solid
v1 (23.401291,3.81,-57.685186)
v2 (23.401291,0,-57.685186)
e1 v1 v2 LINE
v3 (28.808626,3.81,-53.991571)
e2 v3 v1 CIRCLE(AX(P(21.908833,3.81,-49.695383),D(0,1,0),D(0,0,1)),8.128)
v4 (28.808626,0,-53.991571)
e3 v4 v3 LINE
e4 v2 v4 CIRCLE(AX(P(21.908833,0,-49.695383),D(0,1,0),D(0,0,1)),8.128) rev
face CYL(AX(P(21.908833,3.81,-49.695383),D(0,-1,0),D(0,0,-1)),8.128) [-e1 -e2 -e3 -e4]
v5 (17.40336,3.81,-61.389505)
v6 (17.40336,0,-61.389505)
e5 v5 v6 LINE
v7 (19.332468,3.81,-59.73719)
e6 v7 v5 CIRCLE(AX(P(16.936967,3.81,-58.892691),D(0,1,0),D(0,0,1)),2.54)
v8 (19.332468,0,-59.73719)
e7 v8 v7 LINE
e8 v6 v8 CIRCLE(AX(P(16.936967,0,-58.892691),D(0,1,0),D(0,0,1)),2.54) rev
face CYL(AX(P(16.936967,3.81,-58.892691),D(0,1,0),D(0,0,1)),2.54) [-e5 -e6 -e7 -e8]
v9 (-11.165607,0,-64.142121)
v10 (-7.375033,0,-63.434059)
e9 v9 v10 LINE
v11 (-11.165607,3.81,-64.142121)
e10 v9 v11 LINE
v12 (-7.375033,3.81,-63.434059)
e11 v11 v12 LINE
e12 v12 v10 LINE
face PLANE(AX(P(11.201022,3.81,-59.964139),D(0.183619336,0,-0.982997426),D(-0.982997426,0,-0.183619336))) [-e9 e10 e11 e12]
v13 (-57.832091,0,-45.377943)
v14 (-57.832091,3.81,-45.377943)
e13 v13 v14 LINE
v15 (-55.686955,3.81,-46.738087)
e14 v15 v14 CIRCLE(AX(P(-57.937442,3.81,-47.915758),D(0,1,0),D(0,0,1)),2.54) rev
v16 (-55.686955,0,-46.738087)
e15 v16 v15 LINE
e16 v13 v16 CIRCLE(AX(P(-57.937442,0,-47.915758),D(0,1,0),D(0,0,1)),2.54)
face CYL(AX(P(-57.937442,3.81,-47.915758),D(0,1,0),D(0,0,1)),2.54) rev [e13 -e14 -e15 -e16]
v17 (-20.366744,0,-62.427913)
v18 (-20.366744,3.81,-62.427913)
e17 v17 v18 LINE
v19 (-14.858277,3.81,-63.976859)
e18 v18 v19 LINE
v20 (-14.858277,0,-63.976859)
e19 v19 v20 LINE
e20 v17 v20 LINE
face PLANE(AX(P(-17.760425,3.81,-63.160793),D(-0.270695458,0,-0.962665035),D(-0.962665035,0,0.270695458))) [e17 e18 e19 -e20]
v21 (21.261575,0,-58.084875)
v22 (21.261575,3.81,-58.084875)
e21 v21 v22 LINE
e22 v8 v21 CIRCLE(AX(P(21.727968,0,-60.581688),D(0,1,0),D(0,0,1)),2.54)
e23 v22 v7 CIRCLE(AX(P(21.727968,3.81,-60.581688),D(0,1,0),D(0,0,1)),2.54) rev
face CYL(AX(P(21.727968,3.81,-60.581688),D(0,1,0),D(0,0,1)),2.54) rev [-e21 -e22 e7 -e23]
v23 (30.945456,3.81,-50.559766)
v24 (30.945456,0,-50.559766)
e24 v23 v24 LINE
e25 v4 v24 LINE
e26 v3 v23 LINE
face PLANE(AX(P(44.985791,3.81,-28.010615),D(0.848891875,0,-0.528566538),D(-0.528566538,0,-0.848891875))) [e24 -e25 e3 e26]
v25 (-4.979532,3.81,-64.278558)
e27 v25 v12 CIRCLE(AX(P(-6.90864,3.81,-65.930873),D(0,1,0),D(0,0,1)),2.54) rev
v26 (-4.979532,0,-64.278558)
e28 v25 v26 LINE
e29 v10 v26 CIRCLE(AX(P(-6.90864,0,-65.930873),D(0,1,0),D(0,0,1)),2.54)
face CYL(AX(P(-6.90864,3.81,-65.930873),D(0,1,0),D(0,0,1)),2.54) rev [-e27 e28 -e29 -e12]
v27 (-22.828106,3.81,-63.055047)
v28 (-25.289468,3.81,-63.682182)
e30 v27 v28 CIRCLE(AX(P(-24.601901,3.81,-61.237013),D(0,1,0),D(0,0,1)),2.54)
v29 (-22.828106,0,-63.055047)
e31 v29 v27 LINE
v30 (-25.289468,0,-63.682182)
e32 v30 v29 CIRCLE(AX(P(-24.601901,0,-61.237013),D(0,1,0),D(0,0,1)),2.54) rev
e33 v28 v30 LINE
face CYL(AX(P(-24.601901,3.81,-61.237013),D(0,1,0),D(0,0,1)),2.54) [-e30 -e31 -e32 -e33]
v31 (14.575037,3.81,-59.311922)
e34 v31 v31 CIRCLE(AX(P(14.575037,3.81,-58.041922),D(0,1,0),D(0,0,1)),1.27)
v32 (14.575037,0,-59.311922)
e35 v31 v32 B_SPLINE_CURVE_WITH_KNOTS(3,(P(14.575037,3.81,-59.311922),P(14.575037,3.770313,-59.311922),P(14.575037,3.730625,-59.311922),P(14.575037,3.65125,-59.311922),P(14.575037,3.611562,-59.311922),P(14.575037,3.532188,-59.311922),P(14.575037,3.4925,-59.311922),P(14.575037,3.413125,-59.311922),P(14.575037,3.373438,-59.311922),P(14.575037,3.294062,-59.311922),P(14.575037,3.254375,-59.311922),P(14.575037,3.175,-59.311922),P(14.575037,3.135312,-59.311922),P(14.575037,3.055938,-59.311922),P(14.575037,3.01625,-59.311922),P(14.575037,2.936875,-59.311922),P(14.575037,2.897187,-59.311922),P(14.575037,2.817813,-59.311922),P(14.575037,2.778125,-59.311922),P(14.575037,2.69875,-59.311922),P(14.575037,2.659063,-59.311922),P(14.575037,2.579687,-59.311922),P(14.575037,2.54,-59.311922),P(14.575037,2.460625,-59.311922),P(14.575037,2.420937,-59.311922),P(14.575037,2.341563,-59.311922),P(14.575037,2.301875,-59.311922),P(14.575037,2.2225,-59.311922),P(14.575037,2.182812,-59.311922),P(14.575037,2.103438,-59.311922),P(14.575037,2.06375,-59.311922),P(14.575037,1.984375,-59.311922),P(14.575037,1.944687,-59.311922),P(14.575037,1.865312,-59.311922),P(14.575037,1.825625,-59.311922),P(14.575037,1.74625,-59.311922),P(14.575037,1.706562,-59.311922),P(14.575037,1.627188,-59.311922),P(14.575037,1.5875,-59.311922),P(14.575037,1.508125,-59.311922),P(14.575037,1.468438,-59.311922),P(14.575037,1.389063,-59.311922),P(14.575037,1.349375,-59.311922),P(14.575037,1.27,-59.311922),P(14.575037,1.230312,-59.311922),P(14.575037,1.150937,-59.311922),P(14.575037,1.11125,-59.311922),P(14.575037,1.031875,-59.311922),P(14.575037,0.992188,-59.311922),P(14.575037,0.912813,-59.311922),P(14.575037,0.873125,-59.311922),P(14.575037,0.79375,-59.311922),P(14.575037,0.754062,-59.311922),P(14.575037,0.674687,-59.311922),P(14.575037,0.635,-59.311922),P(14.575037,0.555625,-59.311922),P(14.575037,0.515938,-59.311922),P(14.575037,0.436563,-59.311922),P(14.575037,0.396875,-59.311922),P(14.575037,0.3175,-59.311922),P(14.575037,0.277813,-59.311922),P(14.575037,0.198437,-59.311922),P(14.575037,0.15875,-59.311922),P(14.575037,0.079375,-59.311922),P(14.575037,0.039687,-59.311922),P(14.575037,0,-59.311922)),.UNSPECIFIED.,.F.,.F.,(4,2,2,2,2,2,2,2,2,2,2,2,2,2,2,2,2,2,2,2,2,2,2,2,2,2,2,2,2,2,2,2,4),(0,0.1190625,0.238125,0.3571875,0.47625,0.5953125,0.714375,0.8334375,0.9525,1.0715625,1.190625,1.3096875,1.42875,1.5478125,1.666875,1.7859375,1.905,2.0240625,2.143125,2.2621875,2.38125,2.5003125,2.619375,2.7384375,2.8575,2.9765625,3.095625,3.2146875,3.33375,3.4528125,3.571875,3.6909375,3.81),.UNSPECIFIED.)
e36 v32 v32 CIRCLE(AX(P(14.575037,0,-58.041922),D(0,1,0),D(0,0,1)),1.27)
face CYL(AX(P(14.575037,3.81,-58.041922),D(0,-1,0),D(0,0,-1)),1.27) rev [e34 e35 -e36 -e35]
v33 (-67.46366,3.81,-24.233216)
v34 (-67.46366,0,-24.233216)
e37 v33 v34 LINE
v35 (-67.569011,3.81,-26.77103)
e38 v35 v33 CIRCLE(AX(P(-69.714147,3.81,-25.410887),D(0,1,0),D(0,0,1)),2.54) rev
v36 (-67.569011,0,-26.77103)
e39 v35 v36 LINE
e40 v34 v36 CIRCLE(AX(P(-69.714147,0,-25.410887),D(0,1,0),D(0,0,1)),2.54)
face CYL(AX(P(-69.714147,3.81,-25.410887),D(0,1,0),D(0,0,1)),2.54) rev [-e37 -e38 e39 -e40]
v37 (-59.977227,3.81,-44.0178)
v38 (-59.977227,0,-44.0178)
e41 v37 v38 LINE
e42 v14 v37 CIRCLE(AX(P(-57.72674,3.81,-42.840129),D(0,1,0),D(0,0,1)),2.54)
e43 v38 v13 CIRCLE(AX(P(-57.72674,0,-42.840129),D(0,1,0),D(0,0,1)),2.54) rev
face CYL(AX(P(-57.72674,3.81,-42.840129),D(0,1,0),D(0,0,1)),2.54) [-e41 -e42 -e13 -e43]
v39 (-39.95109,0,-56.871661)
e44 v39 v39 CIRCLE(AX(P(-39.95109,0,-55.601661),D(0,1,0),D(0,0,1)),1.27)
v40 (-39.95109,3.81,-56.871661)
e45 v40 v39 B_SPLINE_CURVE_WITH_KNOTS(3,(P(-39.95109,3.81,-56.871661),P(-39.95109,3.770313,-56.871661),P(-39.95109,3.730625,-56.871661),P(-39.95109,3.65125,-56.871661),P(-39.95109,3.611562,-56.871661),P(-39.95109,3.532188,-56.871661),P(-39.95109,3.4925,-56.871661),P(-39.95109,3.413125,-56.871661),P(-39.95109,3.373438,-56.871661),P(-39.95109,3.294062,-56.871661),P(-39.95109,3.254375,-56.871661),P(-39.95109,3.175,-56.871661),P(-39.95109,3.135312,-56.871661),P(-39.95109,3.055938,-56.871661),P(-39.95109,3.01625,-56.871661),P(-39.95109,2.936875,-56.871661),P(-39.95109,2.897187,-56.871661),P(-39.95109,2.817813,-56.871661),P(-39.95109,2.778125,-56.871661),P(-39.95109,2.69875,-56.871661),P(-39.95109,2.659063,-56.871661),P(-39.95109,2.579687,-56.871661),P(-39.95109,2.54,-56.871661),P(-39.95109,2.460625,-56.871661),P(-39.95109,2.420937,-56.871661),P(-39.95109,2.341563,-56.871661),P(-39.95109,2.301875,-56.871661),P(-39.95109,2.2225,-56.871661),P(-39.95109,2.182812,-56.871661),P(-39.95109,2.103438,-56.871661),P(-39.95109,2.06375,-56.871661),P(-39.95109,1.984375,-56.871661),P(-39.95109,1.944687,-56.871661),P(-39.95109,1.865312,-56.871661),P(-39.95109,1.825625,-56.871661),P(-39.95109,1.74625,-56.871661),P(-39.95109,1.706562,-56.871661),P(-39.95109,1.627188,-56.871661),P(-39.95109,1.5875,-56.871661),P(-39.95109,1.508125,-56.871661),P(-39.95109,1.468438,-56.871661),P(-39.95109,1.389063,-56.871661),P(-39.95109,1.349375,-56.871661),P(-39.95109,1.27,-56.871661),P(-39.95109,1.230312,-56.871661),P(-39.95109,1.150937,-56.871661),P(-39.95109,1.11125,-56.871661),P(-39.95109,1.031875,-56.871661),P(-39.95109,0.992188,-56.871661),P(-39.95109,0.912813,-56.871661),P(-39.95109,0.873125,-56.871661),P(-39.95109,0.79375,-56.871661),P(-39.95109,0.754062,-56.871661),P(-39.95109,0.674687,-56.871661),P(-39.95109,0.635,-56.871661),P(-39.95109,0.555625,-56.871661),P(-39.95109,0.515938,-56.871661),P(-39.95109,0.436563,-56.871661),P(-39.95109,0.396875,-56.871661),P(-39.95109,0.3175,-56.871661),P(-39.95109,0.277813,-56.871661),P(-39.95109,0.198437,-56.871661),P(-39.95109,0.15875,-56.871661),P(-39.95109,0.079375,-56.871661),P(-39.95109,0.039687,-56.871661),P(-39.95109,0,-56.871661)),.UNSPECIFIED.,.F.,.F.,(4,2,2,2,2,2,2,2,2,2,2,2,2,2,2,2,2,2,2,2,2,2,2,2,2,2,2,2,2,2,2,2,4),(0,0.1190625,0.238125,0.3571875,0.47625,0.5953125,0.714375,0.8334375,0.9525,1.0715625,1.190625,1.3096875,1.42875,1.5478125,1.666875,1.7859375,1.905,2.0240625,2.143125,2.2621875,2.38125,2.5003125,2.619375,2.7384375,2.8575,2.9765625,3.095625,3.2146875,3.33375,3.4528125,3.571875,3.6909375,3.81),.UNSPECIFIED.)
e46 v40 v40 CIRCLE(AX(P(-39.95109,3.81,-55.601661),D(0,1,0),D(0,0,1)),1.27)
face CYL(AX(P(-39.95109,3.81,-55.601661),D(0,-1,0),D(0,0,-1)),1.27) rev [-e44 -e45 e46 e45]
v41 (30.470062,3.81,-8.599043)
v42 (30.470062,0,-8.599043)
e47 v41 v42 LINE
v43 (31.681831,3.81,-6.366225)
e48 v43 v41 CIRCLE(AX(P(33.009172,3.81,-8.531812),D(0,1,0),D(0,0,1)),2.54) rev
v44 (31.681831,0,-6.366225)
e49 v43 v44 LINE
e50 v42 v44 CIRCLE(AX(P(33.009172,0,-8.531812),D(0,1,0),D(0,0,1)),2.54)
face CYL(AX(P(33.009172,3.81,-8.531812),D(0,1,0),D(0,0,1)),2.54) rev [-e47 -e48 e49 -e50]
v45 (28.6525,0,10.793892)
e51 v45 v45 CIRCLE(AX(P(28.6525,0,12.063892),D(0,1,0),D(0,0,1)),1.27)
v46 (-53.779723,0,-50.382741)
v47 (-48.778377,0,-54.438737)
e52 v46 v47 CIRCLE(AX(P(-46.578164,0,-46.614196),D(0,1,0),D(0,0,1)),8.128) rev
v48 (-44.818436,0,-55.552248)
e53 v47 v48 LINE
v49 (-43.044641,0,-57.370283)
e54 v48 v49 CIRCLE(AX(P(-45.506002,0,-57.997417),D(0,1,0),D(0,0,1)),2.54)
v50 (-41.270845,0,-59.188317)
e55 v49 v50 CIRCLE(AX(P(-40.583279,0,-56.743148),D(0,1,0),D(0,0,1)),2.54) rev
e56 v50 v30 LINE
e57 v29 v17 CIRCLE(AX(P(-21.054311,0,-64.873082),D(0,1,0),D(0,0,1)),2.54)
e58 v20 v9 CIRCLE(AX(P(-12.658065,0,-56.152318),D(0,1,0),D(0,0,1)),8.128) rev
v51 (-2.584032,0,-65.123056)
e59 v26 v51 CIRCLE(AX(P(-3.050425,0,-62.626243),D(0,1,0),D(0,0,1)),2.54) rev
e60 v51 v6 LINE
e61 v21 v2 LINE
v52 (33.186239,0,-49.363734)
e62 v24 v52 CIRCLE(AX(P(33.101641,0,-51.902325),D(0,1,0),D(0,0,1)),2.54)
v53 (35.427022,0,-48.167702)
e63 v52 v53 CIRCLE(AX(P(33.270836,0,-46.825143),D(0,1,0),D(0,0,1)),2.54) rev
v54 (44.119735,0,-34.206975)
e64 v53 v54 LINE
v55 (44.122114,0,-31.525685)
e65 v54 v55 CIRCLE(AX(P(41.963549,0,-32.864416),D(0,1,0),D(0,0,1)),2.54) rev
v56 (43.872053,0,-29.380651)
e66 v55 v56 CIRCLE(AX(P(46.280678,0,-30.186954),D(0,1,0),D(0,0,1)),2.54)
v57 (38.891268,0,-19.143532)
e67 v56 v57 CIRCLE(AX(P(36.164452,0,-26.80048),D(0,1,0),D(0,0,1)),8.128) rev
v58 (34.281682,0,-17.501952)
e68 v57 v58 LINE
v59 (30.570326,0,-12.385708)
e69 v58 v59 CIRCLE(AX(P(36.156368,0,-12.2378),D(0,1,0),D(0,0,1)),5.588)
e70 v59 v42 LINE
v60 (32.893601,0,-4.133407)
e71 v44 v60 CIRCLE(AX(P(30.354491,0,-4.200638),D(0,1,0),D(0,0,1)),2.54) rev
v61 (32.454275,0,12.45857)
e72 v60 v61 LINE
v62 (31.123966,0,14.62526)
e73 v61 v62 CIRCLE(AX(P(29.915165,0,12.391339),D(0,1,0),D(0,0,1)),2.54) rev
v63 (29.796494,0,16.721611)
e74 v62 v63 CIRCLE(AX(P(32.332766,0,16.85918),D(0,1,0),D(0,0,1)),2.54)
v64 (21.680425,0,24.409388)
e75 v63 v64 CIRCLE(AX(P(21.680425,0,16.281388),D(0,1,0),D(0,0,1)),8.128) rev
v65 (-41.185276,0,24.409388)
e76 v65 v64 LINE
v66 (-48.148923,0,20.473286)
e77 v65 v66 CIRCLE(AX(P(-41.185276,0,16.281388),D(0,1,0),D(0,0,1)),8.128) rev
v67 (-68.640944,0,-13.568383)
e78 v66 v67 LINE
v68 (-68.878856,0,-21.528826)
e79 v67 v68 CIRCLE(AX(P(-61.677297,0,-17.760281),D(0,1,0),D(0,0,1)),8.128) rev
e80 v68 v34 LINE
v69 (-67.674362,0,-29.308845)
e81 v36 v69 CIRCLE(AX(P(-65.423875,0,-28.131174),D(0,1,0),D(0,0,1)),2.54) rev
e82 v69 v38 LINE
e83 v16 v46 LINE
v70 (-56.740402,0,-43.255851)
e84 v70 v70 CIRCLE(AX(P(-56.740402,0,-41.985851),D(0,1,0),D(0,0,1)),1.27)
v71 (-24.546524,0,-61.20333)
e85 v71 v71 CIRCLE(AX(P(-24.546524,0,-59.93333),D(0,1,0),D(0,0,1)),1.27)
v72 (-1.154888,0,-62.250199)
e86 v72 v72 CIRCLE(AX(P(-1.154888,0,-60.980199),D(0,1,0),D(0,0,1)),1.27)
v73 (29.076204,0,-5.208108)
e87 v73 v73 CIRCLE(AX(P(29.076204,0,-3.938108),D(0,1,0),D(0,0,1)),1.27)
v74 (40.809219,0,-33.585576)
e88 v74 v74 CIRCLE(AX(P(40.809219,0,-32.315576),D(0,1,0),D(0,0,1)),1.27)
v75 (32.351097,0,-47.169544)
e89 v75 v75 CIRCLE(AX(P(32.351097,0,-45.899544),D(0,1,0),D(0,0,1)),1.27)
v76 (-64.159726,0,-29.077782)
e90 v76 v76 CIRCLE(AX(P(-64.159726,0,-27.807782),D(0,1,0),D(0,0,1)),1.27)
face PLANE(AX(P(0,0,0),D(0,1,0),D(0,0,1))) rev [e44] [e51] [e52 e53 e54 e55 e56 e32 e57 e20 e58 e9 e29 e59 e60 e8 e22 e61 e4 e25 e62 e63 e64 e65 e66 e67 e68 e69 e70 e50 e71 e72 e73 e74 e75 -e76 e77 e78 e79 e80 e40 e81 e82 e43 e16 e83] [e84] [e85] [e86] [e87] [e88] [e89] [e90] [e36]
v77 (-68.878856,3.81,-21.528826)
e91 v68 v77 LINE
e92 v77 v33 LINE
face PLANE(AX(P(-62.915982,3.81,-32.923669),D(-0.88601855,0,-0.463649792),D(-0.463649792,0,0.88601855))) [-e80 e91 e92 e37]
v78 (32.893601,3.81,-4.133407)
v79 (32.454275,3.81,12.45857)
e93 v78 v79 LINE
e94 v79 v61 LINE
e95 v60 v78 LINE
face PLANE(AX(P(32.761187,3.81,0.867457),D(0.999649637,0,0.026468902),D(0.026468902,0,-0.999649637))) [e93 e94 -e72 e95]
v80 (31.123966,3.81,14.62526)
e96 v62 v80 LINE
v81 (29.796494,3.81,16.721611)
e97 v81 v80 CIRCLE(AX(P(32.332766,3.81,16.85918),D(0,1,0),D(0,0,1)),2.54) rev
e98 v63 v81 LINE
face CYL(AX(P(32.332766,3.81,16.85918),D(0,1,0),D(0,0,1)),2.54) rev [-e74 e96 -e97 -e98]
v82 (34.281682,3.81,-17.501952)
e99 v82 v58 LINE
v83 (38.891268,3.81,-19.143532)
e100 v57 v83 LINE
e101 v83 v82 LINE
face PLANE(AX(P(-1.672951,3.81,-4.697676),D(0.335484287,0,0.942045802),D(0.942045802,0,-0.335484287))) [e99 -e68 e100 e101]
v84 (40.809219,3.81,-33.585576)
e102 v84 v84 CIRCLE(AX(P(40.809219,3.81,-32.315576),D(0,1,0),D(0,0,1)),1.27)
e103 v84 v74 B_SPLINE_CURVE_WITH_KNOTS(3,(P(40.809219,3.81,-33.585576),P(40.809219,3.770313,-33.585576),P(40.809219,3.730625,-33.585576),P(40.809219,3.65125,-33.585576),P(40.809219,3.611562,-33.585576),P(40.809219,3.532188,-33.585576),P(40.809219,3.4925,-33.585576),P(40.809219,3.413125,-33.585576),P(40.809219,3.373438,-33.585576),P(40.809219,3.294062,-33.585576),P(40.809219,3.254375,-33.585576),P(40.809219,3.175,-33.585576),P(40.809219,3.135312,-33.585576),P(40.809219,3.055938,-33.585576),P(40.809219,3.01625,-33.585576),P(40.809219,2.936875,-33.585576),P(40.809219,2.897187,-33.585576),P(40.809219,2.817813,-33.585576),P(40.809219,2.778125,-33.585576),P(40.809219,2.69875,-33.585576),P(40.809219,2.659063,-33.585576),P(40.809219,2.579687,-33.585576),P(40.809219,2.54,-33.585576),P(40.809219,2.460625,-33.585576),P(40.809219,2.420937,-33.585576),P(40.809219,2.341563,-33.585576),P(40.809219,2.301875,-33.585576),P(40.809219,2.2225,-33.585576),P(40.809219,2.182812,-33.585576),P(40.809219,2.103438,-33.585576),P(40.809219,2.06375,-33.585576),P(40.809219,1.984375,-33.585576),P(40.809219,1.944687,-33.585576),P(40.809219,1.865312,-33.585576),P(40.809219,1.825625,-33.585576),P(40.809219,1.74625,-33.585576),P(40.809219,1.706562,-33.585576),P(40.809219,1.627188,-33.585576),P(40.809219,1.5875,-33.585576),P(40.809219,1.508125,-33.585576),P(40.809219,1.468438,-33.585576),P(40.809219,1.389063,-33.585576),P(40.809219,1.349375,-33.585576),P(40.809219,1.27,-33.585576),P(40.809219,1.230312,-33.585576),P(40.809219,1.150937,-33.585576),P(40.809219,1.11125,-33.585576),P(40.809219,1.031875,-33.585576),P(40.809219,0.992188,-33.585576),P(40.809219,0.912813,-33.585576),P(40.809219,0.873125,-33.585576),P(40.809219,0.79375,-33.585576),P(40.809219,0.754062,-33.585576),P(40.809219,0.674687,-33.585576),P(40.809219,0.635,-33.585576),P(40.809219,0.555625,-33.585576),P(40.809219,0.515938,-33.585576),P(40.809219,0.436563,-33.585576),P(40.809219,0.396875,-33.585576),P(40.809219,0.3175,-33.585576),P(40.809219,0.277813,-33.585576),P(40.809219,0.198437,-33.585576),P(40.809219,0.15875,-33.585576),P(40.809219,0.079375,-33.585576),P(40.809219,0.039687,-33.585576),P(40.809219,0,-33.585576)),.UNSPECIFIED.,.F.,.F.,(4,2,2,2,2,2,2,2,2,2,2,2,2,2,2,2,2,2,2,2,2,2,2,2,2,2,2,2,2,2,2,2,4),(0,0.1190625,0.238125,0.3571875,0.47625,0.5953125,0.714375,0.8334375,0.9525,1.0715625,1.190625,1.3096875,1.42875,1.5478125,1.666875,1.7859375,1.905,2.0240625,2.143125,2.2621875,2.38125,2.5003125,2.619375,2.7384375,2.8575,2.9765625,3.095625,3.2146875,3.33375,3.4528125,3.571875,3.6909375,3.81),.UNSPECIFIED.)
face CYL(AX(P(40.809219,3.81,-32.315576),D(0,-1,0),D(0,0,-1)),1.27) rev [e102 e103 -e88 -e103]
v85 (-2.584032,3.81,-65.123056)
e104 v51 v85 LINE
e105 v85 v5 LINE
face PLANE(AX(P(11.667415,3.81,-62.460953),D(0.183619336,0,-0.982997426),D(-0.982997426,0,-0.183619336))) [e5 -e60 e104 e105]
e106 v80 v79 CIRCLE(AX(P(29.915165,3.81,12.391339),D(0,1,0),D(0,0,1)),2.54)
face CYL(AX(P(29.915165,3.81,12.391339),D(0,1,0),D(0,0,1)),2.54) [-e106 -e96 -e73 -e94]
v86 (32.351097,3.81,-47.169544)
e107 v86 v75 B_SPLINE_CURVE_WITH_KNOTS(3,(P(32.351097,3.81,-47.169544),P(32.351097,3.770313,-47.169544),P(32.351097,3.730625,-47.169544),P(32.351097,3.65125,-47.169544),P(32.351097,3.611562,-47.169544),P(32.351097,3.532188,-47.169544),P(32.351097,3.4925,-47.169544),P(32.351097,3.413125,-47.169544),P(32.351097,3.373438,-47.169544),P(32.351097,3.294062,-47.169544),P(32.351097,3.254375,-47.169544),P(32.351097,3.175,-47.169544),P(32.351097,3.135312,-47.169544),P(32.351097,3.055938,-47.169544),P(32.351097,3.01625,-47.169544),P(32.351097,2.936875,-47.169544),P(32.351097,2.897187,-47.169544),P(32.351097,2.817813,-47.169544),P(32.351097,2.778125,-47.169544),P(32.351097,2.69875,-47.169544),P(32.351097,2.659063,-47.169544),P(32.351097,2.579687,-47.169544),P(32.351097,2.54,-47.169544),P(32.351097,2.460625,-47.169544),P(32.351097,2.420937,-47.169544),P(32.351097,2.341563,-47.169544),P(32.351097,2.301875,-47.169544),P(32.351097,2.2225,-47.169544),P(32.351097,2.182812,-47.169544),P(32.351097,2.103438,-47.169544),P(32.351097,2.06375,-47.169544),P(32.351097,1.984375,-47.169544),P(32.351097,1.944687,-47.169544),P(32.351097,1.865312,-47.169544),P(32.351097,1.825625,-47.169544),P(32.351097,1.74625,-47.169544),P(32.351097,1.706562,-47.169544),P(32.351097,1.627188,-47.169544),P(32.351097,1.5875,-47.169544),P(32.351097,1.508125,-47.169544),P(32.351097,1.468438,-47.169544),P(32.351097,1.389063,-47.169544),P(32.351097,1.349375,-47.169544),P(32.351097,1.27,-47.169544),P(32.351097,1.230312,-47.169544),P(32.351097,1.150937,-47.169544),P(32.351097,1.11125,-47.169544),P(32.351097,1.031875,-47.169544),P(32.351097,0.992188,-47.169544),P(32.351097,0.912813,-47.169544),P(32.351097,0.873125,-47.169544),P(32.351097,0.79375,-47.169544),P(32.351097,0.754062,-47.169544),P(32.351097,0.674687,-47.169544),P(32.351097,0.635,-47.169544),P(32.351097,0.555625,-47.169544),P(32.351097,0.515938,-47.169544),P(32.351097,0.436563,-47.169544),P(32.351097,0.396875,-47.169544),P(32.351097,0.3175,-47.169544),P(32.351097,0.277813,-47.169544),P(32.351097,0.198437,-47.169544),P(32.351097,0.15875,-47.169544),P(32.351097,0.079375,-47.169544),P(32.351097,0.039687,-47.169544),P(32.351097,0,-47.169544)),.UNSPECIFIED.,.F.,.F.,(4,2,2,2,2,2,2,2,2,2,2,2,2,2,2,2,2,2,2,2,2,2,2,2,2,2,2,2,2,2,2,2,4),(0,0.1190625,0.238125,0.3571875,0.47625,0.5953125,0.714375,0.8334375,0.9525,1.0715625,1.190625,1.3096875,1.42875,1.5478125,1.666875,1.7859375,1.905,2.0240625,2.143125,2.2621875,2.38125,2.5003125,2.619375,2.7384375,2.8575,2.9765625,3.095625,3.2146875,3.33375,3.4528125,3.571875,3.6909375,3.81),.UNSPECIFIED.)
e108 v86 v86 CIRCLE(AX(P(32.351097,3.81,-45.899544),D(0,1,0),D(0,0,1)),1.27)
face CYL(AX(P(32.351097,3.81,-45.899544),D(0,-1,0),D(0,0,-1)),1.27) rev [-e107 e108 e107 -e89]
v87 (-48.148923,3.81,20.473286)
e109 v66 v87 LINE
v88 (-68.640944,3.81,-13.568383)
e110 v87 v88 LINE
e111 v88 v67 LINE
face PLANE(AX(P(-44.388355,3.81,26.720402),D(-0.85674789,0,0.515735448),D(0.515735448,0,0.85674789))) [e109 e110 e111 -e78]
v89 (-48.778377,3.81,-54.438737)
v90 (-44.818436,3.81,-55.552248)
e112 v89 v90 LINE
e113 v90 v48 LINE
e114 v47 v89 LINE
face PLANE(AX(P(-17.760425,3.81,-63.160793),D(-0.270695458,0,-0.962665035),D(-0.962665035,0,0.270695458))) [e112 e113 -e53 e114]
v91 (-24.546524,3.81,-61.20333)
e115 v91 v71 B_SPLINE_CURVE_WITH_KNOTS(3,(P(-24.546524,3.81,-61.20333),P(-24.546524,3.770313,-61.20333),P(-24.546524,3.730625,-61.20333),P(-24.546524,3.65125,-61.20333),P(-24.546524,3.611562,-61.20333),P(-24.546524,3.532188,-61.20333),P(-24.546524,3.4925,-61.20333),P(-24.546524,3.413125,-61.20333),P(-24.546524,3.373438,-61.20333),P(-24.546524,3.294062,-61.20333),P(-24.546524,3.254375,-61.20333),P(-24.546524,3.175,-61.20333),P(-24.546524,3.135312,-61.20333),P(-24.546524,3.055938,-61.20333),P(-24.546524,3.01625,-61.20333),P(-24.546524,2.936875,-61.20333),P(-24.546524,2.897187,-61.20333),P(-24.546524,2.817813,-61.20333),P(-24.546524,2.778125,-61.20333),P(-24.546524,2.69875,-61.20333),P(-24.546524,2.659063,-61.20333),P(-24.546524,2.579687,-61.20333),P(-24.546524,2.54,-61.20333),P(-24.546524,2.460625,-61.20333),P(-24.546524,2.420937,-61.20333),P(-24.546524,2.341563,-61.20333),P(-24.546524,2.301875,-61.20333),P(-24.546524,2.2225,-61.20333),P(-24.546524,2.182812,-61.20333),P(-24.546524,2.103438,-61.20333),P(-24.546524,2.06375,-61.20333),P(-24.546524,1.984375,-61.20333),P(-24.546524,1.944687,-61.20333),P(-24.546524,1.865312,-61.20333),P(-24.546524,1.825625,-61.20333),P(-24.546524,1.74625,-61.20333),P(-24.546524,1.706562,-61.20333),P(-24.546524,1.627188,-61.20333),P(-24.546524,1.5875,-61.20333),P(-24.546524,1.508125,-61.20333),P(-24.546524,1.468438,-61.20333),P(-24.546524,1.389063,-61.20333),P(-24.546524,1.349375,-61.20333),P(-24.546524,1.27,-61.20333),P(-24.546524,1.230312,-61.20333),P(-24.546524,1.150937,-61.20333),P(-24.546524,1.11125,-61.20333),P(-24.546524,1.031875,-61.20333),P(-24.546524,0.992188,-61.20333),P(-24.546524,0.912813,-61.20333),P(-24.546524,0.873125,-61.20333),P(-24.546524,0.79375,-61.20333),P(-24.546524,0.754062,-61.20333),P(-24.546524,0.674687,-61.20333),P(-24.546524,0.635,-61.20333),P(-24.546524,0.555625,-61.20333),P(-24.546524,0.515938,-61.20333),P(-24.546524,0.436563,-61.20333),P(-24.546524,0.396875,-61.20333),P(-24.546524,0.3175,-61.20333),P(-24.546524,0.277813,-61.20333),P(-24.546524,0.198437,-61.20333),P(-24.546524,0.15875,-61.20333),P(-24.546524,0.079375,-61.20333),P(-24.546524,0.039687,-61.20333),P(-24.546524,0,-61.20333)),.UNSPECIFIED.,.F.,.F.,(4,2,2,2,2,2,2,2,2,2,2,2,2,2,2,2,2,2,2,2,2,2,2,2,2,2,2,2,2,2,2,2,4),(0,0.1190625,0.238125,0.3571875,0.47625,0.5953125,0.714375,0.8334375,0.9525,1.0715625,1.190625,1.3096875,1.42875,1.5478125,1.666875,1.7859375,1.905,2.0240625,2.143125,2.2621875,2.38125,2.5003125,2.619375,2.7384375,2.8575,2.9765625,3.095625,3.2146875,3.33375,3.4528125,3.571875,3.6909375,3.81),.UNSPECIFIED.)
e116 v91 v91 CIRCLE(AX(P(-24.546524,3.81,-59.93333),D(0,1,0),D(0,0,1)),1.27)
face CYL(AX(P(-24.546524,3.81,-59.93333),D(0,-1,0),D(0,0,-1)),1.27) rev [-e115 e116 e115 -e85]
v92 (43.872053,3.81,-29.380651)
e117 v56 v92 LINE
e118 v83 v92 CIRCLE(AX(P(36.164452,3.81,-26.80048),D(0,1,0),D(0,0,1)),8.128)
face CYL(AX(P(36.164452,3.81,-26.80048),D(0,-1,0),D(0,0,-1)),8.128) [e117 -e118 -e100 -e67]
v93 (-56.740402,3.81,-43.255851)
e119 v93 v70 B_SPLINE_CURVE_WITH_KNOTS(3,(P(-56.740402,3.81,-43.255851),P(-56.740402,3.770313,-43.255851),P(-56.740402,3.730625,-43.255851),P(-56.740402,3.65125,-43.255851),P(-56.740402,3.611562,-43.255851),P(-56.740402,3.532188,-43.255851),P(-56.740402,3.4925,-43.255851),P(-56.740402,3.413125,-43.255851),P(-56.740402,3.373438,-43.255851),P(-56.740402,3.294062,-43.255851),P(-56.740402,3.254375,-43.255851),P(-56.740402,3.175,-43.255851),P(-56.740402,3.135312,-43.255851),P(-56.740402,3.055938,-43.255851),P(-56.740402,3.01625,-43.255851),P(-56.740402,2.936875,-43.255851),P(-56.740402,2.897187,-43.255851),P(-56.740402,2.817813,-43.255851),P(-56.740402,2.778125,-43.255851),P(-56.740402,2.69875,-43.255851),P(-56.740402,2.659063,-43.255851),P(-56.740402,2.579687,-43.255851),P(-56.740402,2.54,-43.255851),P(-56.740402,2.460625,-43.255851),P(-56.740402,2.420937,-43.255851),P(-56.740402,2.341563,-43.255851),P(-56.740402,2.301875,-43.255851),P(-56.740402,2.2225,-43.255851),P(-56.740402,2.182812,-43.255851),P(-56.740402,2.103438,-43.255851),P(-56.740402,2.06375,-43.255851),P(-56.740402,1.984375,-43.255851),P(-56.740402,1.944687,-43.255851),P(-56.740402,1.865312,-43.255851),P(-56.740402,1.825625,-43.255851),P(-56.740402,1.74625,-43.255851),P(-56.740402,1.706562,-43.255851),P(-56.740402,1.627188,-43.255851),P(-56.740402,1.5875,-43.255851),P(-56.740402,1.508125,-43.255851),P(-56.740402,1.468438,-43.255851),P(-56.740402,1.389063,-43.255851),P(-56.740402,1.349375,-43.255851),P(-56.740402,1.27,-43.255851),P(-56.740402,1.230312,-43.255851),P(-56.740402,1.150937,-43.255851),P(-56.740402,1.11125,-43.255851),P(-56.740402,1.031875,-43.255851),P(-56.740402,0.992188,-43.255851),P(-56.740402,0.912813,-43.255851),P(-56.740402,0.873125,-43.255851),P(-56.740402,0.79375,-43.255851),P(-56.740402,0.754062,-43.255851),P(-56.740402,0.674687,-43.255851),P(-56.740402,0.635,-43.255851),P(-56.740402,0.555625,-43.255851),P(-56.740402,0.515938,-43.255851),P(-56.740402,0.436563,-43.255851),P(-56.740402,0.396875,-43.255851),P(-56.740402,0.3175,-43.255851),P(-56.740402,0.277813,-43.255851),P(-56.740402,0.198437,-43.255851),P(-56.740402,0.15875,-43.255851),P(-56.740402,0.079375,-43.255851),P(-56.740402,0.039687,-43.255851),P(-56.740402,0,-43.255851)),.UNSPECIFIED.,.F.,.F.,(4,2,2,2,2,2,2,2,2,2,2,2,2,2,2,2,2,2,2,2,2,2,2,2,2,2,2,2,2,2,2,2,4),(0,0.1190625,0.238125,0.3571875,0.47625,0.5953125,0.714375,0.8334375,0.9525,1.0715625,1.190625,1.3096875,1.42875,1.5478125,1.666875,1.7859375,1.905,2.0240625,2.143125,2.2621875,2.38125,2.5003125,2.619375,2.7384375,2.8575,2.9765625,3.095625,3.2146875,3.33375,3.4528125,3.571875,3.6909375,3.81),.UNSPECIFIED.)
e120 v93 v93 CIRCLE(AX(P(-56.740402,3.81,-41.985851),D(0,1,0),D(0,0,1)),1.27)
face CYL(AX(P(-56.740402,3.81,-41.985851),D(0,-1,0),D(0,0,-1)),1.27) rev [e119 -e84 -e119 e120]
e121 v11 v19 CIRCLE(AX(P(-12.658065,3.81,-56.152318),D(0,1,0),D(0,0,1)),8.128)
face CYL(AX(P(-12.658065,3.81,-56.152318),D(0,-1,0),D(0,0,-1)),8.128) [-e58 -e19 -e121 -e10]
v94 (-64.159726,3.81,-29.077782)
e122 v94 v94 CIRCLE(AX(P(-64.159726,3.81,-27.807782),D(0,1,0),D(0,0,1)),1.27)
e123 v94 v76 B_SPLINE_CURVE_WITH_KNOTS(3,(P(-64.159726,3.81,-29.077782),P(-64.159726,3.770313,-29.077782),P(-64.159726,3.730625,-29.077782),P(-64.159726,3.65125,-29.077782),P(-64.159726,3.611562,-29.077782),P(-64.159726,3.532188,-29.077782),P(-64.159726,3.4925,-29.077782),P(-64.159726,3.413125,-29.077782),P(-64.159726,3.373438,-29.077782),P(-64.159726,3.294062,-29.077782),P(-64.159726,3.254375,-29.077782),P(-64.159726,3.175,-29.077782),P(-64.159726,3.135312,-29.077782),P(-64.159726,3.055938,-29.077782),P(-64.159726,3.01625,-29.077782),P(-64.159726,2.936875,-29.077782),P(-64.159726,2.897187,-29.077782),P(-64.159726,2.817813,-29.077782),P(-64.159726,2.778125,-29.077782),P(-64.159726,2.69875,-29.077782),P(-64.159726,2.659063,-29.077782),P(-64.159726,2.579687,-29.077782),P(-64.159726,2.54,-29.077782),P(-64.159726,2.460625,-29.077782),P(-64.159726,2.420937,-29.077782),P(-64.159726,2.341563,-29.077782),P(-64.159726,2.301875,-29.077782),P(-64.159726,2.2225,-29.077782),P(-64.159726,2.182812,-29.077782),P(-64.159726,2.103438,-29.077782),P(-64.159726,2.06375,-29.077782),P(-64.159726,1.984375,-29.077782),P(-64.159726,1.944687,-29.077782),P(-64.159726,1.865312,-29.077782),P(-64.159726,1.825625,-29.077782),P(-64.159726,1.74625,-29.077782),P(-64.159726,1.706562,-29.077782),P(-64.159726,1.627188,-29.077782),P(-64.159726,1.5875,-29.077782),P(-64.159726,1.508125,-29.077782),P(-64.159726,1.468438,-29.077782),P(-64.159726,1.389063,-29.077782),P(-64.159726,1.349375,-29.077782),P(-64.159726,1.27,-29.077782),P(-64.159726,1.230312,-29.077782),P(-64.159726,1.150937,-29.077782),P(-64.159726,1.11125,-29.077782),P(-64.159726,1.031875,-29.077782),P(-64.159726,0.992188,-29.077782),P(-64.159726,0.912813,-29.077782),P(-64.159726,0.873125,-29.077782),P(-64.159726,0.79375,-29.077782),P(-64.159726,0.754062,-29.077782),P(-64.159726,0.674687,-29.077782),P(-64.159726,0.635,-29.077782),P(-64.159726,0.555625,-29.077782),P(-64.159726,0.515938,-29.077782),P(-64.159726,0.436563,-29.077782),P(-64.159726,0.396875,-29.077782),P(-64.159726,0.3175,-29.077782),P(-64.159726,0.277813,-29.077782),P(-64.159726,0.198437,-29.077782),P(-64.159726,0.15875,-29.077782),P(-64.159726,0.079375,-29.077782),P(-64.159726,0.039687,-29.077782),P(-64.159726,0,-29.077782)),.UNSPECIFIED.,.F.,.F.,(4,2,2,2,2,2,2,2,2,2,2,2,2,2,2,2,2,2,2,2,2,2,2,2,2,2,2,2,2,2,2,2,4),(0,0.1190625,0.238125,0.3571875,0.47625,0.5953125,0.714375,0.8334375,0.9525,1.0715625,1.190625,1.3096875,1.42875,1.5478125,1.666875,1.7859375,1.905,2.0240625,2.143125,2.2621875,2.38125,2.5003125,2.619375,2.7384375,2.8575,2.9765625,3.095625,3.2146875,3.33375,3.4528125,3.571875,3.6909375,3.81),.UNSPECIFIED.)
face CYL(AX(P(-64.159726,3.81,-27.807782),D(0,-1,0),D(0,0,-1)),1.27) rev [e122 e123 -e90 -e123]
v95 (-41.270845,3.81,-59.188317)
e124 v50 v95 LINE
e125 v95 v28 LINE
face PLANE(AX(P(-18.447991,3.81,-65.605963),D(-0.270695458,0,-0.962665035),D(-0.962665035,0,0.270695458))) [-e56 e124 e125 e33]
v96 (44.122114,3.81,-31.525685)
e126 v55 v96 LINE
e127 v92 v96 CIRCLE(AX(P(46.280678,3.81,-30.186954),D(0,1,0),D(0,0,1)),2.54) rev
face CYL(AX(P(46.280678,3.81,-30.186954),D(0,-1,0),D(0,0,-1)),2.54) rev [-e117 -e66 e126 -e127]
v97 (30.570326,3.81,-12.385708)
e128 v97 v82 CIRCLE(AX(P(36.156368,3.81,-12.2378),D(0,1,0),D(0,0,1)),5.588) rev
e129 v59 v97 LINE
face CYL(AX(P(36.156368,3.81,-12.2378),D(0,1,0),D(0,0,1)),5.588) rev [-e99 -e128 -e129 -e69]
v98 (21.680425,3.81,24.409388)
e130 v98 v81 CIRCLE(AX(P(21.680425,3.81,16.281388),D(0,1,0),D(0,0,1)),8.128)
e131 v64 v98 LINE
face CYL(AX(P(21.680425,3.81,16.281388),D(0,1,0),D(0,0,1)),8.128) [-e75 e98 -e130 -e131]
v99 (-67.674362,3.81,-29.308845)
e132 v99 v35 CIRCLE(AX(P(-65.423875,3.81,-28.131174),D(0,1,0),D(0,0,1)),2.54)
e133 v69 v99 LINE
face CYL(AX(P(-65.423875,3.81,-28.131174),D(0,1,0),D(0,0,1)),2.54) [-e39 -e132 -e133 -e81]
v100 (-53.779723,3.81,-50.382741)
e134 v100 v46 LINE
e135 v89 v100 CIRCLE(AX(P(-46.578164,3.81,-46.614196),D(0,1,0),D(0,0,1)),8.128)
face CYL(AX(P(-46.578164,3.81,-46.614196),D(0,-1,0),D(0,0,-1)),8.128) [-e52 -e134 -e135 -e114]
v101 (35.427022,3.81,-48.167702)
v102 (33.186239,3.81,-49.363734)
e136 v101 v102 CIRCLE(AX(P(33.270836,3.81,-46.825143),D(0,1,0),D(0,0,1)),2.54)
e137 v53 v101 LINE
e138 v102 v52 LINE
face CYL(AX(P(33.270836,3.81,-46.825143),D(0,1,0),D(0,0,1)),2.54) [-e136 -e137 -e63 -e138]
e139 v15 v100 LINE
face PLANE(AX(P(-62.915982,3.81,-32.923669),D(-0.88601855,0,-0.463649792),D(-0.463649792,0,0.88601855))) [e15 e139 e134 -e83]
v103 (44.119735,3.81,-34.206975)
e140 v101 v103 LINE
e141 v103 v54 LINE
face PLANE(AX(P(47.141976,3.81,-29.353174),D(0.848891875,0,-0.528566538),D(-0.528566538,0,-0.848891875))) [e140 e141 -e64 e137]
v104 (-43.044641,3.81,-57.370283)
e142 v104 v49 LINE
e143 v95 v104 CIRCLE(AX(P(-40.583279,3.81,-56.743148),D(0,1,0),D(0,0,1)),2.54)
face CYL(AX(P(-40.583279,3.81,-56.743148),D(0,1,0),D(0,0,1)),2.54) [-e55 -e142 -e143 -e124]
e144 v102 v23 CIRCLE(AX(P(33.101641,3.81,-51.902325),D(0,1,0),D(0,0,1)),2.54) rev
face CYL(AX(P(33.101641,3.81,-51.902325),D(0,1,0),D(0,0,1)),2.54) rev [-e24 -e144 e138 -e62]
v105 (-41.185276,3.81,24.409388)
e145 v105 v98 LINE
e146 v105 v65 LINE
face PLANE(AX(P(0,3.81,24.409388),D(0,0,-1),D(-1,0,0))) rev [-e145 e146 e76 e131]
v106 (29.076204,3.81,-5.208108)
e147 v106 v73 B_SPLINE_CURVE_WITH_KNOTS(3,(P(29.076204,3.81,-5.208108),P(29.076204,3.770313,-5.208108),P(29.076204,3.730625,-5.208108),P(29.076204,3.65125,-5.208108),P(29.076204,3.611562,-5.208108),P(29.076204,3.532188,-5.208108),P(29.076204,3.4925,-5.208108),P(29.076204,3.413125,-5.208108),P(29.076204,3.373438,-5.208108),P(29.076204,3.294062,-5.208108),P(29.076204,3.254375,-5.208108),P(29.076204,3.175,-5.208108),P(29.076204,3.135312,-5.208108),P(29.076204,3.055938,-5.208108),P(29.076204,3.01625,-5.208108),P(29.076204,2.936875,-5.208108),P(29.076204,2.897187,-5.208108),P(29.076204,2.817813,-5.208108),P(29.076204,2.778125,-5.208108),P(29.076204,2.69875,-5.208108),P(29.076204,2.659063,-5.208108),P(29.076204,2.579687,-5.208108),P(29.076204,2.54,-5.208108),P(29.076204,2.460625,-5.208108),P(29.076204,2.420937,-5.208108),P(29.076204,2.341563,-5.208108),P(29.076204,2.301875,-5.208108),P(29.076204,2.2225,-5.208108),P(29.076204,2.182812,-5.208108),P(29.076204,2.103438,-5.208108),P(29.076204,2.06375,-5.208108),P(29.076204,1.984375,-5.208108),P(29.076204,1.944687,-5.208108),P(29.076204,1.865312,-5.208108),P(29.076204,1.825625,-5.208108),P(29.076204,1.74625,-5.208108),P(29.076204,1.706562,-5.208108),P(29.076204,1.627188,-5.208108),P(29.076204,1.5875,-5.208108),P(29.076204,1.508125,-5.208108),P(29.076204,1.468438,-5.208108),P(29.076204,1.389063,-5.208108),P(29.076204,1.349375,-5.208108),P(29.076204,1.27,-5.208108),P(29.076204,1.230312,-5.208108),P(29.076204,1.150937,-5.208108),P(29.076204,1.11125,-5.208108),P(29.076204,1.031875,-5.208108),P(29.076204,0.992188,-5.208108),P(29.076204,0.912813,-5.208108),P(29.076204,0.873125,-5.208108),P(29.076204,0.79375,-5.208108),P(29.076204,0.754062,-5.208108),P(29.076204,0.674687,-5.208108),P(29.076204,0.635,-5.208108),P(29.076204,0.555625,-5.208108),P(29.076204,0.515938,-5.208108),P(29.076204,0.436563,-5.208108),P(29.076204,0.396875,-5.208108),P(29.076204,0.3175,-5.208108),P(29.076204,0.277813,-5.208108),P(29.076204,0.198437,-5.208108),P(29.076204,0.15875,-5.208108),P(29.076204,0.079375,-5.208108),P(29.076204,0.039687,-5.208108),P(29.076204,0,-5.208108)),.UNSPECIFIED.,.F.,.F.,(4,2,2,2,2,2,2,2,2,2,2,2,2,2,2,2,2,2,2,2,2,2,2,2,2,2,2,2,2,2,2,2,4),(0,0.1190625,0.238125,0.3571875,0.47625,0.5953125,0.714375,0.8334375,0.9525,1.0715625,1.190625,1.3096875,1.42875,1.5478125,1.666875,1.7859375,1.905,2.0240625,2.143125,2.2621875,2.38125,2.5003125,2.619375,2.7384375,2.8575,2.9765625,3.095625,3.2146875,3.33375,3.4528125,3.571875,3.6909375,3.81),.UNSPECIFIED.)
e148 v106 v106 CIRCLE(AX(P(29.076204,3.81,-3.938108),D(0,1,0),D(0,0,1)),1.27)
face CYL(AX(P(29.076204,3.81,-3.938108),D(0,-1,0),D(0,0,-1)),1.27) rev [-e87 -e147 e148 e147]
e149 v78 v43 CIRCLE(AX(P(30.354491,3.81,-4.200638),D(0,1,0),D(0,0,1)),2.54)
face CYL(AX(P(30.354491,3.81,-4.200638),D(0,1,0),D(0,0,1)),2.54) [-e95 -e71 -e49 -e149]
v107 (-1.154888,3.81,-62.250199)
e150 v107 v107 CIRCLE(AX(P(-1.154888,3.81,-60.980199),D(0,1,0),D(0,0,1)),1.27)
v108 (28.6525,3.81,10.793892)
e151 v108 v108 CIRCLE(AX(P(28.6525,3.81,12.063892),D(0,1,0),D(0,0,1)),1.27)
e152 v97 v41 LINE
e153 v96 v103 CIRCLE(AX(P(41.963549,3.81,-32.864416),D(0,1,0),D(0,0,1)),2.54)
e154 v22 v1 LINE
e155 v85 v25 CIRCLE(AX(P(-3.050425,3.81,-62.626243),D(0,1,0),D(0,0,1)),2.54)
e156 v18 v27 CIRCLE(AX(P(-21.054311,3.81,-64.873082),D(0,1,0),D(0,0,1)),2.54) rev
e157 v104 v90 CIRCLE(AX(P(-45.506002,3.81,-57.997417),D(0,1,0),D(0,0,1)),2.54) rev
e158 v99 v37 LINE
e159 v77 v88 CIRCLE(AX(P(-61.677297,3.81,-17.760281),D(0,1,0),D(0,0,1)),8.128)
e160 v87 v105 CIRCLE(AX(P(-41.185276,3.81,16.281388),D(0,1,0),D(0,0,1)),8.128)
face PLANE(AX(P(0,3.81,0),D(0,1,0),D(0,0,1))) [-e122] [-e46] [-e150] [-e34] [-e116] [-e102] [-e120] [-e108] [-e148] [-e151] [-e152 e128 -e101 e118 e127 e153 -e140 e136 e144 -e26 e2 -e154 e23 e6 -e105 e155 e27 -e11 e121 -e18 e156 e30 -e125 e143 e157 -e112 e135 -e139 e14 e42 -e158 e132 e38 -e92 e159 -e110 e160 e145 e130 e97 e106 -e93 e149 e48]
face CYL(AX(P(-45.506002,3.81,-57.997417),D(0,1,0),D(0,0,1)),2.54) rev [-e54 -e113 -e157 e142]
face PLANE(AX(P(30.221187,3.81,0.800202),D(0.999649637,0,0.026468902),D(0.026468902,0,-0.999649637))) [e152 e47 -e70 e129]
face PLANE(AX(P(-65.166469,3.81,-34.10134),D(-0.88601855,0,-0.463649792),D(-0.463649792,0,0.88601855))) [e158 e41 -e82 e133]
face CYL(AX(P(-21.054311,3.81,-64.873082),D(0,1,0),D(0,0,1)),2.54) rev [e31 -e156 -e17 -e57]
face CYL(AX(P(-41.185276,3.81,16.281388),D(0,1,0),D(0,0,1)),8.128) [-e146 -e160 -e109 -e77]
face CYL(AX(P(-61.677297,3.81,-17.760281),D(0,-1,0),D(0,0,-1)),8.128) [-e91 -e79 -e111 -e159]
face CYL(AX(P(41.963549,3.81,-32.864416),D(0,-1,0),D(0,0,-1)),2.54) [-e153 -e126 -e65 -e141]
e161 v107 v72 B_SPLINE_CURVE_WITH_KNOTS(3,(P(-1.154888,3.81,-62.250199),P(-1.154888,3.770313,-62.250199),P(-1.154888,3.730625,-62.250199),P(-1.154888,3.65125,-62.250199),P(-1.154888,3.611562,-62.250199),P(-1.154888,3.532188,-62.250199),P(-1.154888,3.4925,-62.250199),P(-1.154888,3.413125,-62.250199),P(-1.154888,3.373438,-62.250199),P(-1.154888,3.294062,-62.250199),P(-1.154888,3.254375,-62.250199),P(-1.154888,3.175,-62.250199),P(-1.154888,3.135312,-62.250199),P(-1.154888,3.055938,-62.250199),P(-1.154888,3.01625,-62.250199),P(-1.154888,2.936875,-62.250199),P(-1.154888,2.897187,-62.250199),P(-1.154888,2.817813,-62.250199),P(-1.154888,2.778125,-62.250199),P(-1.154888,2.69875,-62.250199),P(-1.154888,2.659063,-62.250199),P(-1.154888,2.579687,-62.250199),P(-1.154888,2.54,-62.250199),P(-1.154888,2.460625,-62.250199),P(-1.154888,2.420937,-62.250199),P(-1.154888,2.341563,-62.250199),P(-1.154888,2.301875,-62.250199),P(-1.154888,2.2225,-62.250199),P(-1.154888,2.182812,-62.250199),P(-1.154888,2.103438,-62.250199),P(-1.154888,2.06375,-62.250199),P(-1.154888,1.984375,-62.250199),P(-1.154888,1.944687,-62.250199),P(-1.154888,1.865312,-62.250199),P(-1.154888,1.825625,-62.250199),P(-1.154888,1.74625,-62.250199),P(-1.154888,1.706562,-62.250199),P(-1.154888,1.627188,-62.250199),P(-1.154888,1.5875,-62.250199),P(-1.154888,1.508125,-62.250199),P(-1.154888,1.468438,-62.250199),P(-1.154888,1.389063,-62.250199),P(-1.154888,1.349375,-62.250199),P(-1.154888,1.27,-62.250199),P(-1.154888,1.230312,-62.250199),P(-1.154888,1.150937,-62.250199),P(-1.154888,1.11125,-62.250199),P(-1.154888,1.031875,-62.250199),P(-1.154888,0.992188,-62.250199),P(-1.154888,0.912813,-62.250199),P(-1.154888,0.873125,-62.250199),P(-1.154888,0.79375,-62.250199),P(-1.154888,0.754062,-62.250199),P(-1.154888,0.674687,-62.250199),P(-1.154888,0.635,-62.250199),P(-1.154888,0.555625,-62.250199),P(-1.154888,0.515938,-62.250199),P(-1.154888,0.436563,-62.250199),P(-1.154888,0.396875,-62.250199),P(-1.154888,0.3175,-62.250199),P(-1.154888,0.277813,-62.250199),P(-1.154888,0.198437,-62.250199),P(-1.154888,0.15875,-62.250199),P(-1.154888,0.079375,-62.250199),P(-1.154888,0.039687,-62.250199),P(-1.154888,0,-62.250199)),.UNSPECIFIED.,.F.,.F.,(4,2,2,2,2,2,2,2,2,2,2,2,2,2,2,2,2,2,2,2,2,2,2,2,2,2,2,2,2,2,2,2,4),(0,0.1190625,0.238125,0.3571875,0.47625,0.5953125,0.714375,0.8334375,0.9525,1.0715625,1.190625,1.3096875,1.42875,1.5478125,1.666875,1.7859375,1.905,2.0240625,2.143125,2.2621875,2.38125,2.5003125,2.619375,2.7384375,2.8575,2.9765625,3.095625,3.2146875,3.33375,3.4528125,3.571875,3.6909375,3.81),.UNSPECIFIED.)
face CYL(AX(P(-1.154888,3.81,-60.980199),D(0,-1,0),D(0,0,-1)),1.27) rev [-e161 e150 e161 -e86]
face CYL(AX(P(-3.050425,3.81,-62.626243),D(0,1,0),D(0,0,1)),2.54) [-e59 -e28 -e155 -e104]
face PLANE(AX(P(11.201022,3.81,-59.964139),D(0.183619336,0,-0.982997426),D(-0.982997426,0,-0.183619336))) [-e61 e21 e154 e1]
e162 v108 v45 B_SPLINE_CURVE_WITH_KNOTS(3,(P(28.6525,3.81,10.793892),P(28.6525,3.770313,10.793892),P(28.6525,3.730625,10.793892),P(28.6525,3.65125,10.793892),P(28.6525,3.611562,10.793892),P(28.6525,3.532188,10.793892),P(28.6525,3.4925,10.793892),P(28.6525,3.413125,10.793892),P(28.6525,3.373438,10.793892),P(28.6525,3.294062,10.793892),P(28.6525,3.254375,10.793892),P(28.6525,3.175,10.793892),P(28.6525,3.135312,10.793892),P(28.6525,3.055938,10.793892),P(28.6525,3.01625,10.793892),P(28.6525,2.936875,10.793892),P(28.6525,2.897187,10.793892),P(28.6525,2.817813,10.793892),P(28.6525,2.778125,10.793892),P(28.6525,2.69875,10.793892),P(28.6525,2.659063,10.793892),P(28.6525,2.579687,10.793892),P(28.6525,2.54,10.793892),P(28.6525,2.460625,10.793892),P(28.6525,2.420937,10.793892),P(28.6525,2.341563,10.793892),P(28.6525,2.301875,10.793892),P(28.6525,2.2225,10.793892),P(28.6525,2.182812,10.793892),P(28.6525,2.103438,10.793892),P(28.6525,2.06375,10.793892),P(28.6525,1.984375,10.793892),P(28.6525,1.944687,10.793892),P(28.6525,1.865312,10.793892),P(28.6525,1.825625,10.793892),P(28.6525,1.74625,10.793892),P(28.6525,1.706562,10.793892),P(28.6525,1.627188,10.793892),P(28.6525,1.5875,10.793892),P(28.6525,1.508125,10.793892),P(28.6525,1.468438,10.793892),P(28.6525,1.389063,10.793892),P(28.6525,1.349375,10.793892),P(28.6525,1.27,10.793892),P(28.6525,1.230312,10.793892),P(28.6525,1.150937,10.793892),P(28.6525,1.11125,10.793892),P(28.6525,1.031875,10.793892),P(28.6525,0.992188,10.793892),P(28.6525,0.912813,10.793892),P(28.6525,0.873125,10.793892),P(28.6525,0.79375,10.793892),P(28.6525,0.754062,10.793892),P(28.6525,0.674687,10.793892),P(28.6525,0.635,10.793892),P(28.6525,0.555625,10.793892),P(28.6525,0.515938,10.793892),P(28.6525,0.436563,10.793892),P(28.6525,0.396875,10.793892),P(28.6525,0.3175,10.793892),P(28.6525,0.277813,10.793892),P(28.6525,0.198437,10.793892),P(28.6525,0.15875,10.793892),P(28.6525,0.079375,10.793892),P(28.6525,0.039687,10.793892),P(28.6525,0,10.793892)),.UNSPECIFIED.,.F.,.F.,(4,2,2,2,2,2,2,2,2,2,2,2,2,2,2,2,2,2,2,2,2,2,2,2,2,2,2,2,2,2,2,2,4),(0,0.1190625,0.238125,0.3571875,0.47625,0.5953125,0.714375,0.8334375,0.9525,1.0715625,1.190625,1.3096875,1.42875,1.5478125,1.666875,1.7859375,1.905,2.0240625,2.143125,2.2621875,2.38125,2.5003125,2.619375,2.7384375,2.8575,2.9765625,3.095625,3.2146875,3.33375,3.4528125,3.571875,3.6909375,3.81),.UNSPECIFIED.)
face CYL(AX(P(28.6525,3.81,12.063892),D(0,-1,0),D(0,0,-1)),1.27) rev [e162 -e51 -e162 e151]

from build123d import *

# Parameters (mm, degrees)
SKETCH1_R           = 1.27
BOSS_EXTRUDE1_DEPTH = 3.81
FILLET1_R           = 8.128
FILLET2_R           = 5.588
FILLET3_R           = 2.54
FILLET4_R           = 2.54


with BuildPart() as part:
    # Sketch1 → Boss-Extrude1 (new body)
    with BuildSketch(Plane(origin=(0, 0, 0), x_dir=(1, 0, 0), z_dir=(0, 1, 0))):
        Polygon((26.917778839, 57.028322157), (18.764761653, 58.551267753), (19.231154767, 61.048081215), (-4.411826254, 65.464479834), (-4.878219367, 62.967666372), (-13.031236553, 64.490611968), (-22.811913306, 61.740346117), (-23.499479769, 64.185515305), (-43.060833275, 58.684983602), (-42.373266812, 56.239814414), (-52.153943565, 53.489548563), (-56.864625449, 44.487600096), (-59.115112565, 45.665270567), (-68.536476333, 27.661373635), (-66.285989216, 26.483703164), (-70.9966711, 17.481754697), (-45.779512683, -24.409388032), (29.596058622, -24.409388032), (29.864982666, -14.252947718), (32.404982666, -14.320202292), (32.942830753, 5.992678337), (30.402830753, 6.059932911), (30.671754796, 16.216373225), (48.398722953, 22.529356376), (43.028486925, 31.154097821), (45.184672286, 32.496656828), (34.444200229, 49.746139719), (32.288014868, 48.403580712), align=None)
        with Locations(Location((28.652499761, -12.063891898, 0), (0, 0, 90))):
            Circle(SKETCH1_R, mode=Mode.SUBTRACT)
        with Locations(Location((29.076203579, 3.938108102, 0), (0, 0, 90))):
            Circle(SKETCH1_R, mode=Mode.SUBTRACT)
        with Locations(Location((-64.159725757, 27.807781977, 0), (0, 0, 90))):
            Circle(SKETCH1_R, mode=Mode.SUBTRACT)
        with Locations(Location((-56.740401791, 41.985850812, 0), (0, 0, 90))):
            Circle(SKETCH1_R, mode=Mode.SUBTRACT)
        with Locations(Location((-39.951089771, 55.601661313, 0), (0, 0, 90))):
            Circle(SKETCH1_R, mode=Mode.SUBTRACT)
        with Locations(Location((-24.546523885, 59.933330029, 0), (0, 0, 90))):
            Circle(SKETCH1_R, mode=Mode.SUBTRACT)
        with Locations(Location((40.809219088, 32.315575875, 0), (0, 0, 90))):
            Circle(SKETCH1_R, mode=Mode.SUBTRACT)
        with Locations(Location((-1.154887819, 60.980198638, 0), (0, 0, 90))):
            Circle(SKETCH1_R, mode=Mode.SUBTRACT)
        with Locations(Location((14.575036992, 58.041922025, 0), (0, 0, 90))):
            Circle(SKETCH1_R, mode=Mode.SUBTRACT)
        with Locations(Location((32.351097343, 45.899543651, 0), (0, 0, 90))):
            Circle(SKETCH1_R, mode=Mode.SUBTRACT)
    extrude(amount=BOSS_EXTRUDE1_DEPTH)

    # Fillet1
    fillet1_edges = [part.edges().sort_by_distance(p)[0] for p in [
        (29.596058622, 1.905, 24.409388032),
        (-45.779512683, 1.905, 24.409388032),
        (-70.9966711, 1.905, -17.481754697),
        (-52.153943565, 1.905, -53.489548563),
        (-13.031236553, 1.905, -64.490611968),
        (26.917778839, 1.905, -57.028322157),
        (48.398722953, 1.905, -22.529356376),
    ]]
    fillet(fillet1_edges, radius=FILLET1_R)

    # Fillet2
    fillet2_edges = [part.edges().sort_by_distance(p)[0] for p in [
        (30.671754796, 1.905, -16.216373225),
    ]]
    fillet(fillet2_edges, radius=FILLET2_R)

    # Fillet3
    # the kernel refuses this fillet: 2.54 mm, written as the material it adds along each edge
    with BuildSketch(Plane(origin=(43.028486925, 0, -31.154097821), x_dir=(0.42954622715766955, 0, 0.9030448708312405), z_dir=(0, 1, 0))) as fillet3_piece_1:
        with BuildLine():
            CenterArc((2.27034081, 2.521441091), FILLET3_R, 186.469886636, 76.599657859)
            Line((-0.253482478, 2.235231353), (-0.505864807, 2.206610379))
            Line((-0.505864807, 2.206610379), (-0.252382329, -0.028620974))
            Line((-0.252382329, -0.028620974), (0.028620974, -0.252382329))
            ThreePointArc((0.028620974, -0.252382329), (0.095841513, -0.244759302), (1.933204138, -0.252144109))
            Line((1.933204138, -0.252144109), (1.963852927, 0))
        make_face()
    extrude(amount=3.81)
    with BuildSketch(Plane(origin=(29.864982666, 0, 14.252947718), x_dir=(0.9996496372388306, 0, 0.02646890190911047), z_dir=(0, 1, 0))) as fillet3_piece_2:
        with BuildLine():
            CenterArc((2.535902872, -2.54), FILLET3_R, 90, 88.412002671)
            Line((-0.003121621, -2.469610926), (-0.25702407, -2.462572019))
            ThreePointArc((-0.25702407, -2.462572019), (-0.254, -2.244365891), (-0.254, 0))
            Line((-0.254, 0), (0, 0.254))
            Line((0, 0.254), (2.535902872, 0.254))
            Line((2.535902872, 0.254), (2.535902872, 0))
        make_face()
    extrude(amount=3.81)
    with BuildSketch(Plane(origin=(30.402830753, 0, -6.059932911), x_dir=(0.026468901909109464, 0, -0.9996496372388307), z_dir=(0, 1, 0)), Plane(origin=(-66.285989216, 0, -26.483703164), x_dir=(-0.4636497916963805, 0, 0.8860185498396199), z_dir=(0, 1, 0)), Plane(origin=(-56.864625449, 0, -44.487600096), x_dir=(-0.8860185498396245, 0, -0.46364979169637166), z_dir=(0, 1, 0))) as fillet3_piece_3:
        with BuildLine():
            CenterArc((FILLET3_R, -FILLET3_R), FILLET3_R, 90, 90)
            Line((0, -FILLET3_R), (0, 0))
            Line((0, 0), (FILLET3_R, 0))
        make_face()
    extrude(amount=3.81)
    with BuildSketch(Plane(origin=(-42.373266812, 0, -56.239814414), x_dir=(-0.27069545780340803, 0, -0.9626650347470834), z_dir=(0, 1, 0)), Plane(origin=(-22.811913306, 0, -61.740346117), x_dir=(0.9626650347470831, 0, -0.27069545780340953), z_dir=(0, 1, 0)), Plane(origin=(-4.878219367, 0, -62.967666372), x_dir=(0.18361933590472898, 0, -0.9829974259792882), z_dir=(0, 1, 0)), Plane(origin=(18.764761653, 0, -58.551267753), x_dir=(0.9829974259792874, 0, 0.18361933590473364), z_dir=(0, 1, 0)), Plane(origin=(32.288014868, 0, -48.403580712), x_dir=(0.848891874527916, 0, -0.5285665382527359), z_dir=(0, 1, 0))) as fillet3_piece_4:
        with BuildLine():
            CenterArc((FILLET3_R, FILLET3_R), FILLET3_R, 180, 90)
            Line((0, FILLET3_R), (0, 0))
            Line((0, 0), (FILLET3_R, 0))
        make_face()
    extrude(amount=3.81)

    # Fillet4
    fillet4_edges = [part.edges().sort_by_distance(p)[0] for p in [
        (32.404982666, 1.905, 14.320202292),
        (32.942830753, 1.905, -5.992678337),
        (45.184672286, 1.905, -32.496656828),
        (34.444200229, 1.905, -49.746139719),
        (19.231154767, 1.905, -61.048081215),
        (-4.411826254, 1.905, -65.464479834),
        (-23.499479769, 1.905, -64.185515305),
        (-43.060833275, 1.905, -58.684983602),
        (-59.115112565, 1.905, -45.665270567),
        (-68.536476333, 1.905, -27.661373635),
    ]]
    fillet(fillet4_edges, radius=FILLET4_R)


solid = part.part
